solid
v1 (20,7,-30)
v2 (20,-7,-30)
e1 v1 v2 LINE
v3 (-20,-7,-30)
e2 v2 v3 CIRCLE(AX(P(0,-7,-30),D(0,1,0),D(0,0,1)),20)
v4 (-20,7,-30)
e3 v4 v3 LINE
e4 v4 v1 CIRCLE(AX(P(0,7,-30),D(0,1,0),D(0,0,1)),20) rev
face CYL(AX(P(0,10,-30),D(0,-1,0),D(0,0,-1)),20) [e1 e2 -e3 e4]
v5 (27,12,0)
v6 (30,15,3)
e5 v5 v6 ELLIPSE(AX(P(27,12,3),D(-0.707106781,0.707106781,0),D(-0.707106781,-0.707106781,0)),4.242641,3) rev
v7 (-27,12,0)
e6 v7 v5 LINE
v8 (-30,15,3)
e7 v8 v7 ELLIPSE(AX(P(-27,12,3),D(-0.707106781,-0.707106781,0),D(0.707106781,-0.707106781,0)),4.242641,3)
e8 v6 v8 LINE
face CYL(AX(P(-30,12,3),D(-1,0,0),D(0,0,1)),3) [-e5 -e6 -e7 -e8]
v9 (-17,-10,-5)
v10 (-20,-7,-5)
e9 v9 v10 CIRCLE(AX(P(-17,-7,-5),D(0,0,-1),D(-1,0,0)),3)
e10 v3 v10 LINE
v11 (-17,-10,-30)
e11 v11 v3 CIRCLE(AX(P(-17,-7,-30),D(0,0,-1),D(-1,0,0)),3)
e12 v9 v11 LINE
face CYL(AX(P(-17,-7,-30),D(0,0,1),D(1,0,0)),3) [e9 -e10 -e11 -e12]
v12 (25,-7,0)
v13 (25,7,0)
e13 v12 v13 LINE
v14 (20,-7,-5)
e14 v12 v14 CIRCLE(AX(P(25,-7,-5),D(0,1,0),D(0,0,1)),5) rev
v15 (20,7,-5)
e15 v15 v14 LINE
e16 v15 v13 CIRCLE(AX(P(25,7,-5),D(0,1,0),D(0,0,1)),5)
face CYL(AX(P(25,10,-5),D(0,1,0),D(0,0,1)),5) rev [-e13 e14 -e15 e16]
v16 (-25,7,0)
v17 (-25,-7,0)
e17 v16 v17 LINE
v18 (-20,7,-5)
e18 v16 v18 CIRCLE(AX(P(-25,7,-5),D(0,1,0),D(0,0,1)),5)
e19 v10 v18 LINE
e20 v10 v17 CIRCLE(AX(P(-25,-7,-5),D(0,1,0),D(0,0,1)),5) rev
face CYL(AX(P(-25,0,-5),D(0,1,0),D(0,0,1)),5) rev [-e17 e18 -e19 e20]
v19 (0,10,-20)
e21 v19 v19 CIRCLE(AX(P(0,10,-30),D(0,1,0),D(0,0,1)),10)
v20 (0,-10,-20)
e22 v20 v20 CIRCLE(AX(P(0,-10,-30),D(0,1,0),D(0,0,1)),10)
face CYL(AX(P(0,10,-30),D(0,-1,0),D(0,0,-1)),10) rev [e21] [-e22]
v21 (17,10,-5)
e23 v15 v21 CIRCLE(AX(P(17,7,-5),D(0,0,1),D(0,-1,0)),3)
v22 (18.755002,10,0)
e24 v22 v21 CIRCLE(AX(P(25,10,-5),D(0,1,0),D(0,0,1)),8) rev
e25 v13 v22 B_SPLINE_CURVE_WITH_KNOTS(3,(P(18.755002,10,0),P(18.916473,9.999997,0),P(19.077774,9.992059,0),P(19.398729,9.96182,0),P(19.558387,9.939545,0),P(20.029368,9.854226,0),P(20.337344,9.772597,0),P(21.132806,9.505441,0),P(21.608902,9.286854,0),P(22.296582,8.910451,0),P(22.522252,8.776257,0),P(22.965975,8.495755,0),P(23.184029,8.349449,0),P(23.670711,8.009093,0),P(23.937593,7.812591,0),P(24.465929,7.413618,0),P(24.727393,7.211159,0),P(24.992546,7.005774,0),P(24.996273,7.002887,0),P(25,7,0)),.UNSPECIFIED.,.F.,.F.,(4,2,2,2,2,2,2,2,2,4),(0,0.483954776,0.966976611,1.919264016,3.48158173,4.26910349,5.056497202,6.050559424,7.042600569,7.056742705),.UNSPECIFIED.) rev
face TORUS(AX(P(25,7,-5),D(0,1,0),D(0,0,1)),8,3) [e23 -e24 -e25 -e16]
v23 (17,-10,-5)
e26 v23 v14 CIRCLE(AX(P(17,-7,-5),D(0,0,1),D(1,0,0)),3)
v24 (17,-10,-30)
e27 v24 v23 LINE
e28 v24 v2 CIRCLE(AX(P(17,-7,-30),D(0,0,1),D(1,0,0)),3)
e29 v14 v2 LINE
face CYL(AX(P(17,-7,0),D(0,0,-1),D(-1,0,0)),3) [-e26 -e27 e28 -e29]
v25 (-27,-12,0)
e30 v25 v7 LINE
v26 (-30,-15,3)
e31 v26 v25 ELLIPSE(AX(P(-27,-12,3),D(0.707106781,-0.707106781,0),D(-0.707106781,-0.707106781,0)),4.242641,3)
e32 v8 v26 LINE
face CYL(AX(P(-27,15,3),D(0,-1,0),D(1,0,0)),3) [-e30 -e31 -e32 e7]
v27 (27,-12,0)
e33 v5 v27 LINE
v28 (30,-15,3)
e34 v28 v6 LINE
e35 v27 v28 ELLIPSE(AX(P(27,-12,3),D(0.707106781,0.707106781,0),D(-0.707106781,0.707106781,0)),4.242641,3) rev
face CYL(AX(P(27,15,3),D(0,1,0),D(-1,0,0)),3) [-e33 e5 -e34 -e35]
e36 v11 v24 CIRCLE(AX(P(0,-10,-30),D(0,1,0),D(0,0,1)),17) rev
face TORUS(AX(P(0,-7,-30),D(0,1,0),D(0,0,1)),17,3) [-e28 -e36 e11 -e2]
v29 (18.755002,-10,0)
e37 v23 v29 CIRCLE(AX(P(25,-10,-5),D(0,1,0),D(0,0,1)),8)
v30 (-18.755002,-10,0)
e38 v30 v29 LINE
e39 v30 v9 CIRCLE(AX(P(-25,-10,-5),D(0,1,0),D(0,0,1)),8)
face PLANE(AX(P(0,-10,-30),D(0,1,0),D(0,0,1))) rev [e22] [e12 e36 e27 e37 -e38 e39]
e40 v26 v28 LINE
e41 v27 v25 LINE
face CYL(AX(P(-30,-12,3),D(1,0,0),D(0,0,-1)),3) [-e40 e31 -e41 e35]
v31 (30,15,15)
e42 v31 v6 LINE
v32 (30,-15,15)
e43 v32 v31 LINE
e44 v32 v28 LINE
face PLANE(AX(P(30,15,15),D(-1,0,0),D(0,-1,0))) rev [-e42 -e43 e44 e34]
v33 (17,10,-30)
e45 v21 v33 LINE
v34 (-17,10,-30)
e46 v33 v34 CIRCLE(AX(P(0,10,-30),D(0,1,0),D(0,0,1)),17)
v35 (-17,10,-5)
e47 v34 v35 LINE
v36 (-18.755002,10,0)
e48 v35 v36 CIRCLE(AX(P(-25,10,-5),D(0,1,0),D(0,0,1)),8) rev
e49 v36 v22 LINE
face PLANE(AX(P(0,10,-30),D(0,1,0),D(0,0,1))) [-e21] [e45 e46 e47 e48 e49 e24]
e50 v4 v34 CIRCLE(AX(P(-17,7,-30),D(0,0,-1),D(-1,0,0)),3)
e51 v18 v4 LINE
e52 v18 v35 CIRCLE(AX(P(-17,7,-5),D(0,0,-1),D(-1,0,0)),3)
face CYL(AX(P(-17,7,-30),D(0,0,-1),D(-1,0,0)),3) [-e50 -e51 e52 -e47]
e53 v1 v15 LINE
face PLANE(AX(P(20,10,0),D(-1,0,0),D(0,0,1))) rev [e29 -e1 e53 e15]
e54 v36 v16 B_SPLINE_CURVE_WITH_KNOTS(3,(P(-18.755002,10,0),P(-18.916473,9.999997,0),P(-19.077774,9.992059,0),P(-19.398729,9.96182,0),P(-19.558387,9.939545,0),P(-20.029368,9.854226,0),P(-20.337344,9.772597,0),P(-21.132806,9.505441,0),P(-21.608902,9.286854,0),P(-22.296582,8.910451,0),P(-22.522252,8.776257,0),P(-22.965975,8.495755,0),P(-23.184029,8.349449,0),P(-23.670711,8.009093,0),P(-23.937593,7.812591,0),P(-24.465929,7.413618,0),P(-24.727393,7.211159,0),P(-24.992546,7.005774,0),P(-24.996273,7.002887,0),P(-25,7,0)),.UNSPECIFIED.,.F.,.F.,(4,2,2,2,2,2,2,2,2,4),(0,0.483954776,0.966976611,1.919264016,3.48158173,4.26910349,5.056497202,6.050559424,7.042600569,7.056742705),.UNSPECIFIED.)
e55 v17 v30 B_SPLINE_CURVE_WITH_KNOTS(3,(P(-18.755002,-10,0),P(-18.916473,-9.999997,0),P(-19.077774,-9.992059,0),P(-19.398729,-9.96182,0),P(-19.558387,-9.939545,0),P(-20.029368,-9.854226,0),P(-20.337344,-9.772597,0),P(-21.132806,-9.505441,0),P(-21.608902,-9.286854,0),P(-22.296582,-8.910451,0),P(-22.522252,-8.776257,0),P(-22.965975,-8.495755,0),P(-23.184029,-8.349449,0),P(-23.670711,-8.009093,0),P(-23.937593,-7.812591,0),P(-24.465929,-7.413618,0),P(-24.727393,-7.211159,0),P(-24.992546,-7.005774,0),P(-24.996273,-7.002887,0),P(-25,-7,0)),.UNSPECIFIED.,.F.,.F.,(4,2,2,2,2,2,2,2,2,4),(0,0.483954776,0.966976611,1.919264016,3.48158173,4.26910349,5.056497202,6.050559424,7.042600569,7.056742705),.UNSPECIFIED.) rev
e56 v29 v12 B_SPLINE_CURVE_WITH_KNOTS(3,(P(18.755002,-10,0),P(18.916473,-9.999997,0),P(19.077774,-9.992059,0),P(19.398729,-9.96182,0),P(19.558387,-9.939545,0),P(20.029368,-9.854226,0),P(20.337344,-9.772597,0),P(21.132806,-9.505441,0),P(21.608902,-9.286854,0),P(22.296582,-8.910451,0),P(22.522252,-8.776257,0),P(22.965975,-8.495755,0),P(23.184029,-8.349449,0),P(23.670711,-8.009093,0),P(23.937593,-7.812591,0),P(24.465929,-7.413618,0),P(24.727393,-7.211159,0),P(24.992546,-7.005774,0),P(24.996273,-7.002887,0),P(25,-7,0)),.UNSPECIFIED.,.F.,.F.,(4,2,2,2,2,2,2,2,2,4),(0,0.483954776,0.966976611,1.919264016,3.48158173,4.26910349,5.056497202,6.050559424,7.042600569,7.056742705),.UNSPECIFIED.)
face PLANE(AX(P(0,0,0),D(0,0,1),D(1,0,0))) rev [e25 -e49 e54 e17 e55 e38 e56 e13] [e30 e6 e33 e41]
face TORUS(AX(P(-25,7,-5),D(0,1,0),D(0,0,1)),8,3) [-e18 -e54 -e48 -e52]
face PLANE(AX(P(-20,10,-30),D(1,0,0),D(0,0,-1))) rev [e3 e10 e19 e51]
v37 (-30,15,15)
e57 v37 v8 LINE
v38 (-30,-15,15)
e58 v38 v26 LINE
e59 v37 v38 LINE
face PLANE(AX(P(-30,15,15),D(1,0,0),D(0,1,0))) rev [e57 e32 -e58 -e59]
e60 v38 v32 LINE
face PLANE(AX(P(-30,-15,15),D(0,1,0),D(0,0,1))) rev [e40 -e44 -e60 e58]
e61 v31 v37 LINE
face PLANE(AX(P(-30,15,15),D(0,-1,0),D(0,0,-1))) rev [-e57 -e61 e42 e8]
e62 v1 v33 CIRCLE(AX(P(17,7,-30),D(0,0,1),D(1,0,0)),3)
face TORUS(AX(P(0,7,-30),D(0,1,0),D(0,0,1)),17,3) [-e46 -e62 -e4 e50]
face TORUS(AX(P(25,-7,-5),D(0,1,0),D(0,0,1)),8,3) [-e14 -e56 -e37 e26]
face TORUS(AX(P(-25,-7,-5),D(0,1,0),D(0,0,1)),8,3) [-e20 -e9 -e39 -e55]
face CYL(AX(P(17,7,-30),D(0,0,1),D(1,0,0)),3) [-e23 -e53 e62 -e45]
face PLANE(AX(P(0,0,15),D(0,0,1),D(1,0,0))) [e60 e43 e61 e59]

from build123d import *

# Parameters (mm, degrees)
SKETCH1_W           = 60
SKETCH1_H           = 30
BOSS_EXTRUDE1_DEPTH = 15
SKETCH2_R           = 10
BOSS_EXTRUDE2_DEPTH = 10
FILLET1_R           = 5
FILLET2_R           = 3


with BuildPart() as part:
    # Sketch1 → Boss-Extrude1 (new body)
    with BuildSketch(Plane.XY):
        Rectangle(SKETCH1_W, SKETCH1_H)
    extrude(amount=BOSS_EXTRUDE1_DEPTH)

    # Sketch2 → Boss-Extrude2 (add, symmetric)
    with BuildSketch(Plane(origin=(0, 0, 0), x_dir=(1, 0, 0), z_dir=(0, 1, 0))):
        with BuildLine():
            Line((-20, 30), (-20, 0))
            Line((-20, 0), (20, 0))
            Line((20, 0), (20, 30))
            ThreePointArc((20, 30), (0, 50), (-20, 30))
        make_face()
        with Locations(Location((0, 30, 0), (0, 0, 270))):
            Circle(SKETCH2_R, mode=Mode.SUBTRACT)
    extrude(amount=BOSS_EXTRUDE2_DEPTH, both=True)

    # Fillet1
    fillet1_edges = [part.edges().sort_by_distance(p)[0] for p in [
        (-20, 0, 0),
        (20, 0, 0),
    ]]
    fillet(fillet1_edges, radius=FILLET1_R)

    # Fillet2
    # the kernel refuses this fillet: 3 mm, written as the material it takes off along each edge
    with BuildSketch(Plane(origin=(0, 10, -30), x_dir=(1, 0, 0), z_dir=(0, 0, 1))) as fillet2_piece_1:
        with BuildLine():
            CenterArc((20 - FILLET2_R, -FILLET2_R), FILLET2_R, 0, 90)
            Line((20 - FILLET2_R, 0), (20, 0))
            Line((20, 0), (20, -FILLET2_R))
        make_face()
    revolve(axis=Axis((0, 10, -30), (0, 1, 0)), revolution_arc=180, mode=Mode.SUBTRACT)
    with BuildSketch(Plane(origin=(-20, 10, -30), x_dir=(0, -1, 0), z_dir=(0, 0, 1)), Plane(origin=(20, 10, -5), x_dir=(0, -1, 0), z_dir=(0, 0, -1))) as fillet2_piece_2:
        with BuildLine():
            CenterArc((FILLET2_R, FILLET2_R), FILLET2_R, 180, 90)
            Line((0, FILLET2_R), (0, 0))
            Line((0, 0), (FILLET2_R, 0))
        make_face()
    extrude(amount=25, mode=Mode.SUBTRACT)
    with BuildSketch(Plane(origin=(0, -10, -30), x_dir=(1, 0, 0), z_dir=(0, 0, 1))) as fillet2_piece_3:
        with BuildLine():
            CenterArc((20 - FILLET2_R, FILLET2_R), FILLET2_R, 270, 90)
            Line((20 - FILLET2_R, 0), (20, 0))
            Line((20, 0), (20, FILLET2_R))
        make_face()
    revolve(axis=Axis((0, -10, -30), (0, 1, 0)), revolution_arc=180, mode=Mode.SUBTRACT)
    with BuildSketch(Plane(origin=(-20, -10, -30), x_dir=(0, 1, 0), z_dir=(0, 0, 1)), Plane(origin=(20, -10, -5), x_dir=(0, 1, 0), z_dir=(0, 0, -1))) as fillet2_piece_4:
        with BuildLine():
            CenterArc((FILLET2_R, -FILLET2_R), FILLET2_R, 90, 90)
            Line((0, -FILLET2_R), (0, 0))
            Line((0, 0), (FILLET2_R, 0))
        make_face()
    extrude(amount=25, mode=Mode.SUBTRACT)
    with BuildSketch(Plane(origin=(25, -10, -5), x_dir=(0.9975374290817743, 0, 0.07013613605641604), z_dir=(0.07013613605641604, 0, -0.9975374290817743))) as fillet2_piece_5_section:
        with BuildLine():
            CenterArc((5 + FILLET2_R, -FILLET2_R), FILLET2_R, 90, 90)
            Line((5 + FILLET2_R, 0), (5, 0))
            Line((5, 0), (5, -FILLET2_R))
        make_face()
    fillet2_piece_5 = revolve(axis=Axis((25, -10, -5), (0, -1, 0)), revolution_arc=175.978193542, mode=Mode.PRIVATE)
    fillet2_piece_5 = split(fillet2_piece_5, bisect_by=Plane(origin=(21.314130097, -9.156886231, 0), z_dir=(0, 0, -1)), keep=Keep.TOP, mode=Mode.PRIVATE)
    add(fillet2_piece_5, mode=Mode.SUBTRACT)
    with BuildSketch(Plane(origin=(25, 10, -5), x_dir=(0.9975374290817743, 0, 0.07013613605641604), z_dir=(0.07013613605641604, 0, -0.9975374290817743))) as fillet2_piece_6_section:
        with BuildLine():
            CenterArc((5 + FILLET2_R, FILLET2_R), FILLET2_R, 180, 90)
            Line((5, FILLET2_R), (5, 0))
            Line((5, 0), (5 + FILLET2_R, 0))
        make_face()
    fillet2_piece_6 = revolve(axis=Axis((25, 10, -5), (0, -1, 0)), revolution_arc=175.978193542, mode=Mode.PRIVATE)
    fillet2_piece_6 = split(fillet2_piece_6, bisect_by=Plane(origin=(21.314129988, 9.156886191, 0), z_dir=(0, 0, -1)), keep=Keep.TOP, mode=Mode.PRIVATE)
    add(fillet2_piece_6, mode=Mode.SUBTRACT)
    with BuildSketch(Plane(origin=(-25, -10, -5), x_dir=(-0.9975374290817743, 0, 0.07013613605641587), z_dir=(-0.07013613605641587, 0, -0.9975374290817743))) as fillet2_piece_7_section:
        with BuildLine():
            CenterArc((5 + FILLET2_R, FILLET2_R), FILLET2_R, 180, 90)
            Line((5 + FILLET2_R, 0), (5, 0))
            Line((5, 0), (5, FILLET2_R))
        make_face()
    fillet2_piece_7 = revolve(axis=Axis((-25, -10, -5), (0, 1, 0)), revolution_arc=175.978193542, mode=Mode.PRIVATE)
    fillet2_piece_7 = split(fillet2_piece_7, bisect_by=Plane(origin=(-21.314129744, -9.156885957, 0), z_dir=(0, 0, -1)), keep=Keep.TOP, mode=Mode.PRIVATE)
    add(fillet2_piece_7, mode=Mode.SUBTRACT)
    with BuildSketch(Plane(origin=(-25, 10, -5), x_dir=(-0.9975374290817743, 0, 0.07013613605641587), z_dir=(-0.07013613605641587, 0, -0.9975374290817743))) as fillet2_piece_8_section:
        with BuildLine():
            CenterArc((5 + FILLET2_R, -FILLET2_R), FILLET2_R, 90, 90)
            Line((5 + FILLET2_R, 0), (5, 0))
            Line((5, 0), (5, -FILLET2_R))
        make_face()
    fillet2_piece_8 = revolve(axis=Axis((-25, 10, -5), (0, 1, 0)), revolution_arc=175.978193542, mode=Mode.PRIVATE)
    fillet2_piece_8 = split(fillet2_piece_8, bisect_by=Plane(origin=(-21.314129744, 9.156885957, 0), z_dir=(0, 0, -1)), keep=Keep.TOP, mode=Mode.PRIVATE)
    add(fillet2_piece_8, mode=Mode.SUBTRACT)
    with BuildSketch(Plane(origin=(37.5, -15, 0), x_dir=(0, 1, 0), z_dir=(-1, 0, 0)), Plane(origin=(-37.5, 15, 0), x_dir=(0, -1, 0), z_dir=(1, 0, 0))) as fillet2_piece_9:
        with BuildLine():
            CenterArc((FILLET2_R, -FILLET2_R), FILLET2_R, 90, 90)
            Line((0, -FILLET2_R), (0, 0))
            Line((0, 0), (FILLET2_R, 0))
        make_face()
    extrude(amount=75, mode=Mode.SUBTRACT)
    with BuildSketch(Plane(origin=(-30, -22.5, 0), x_dir=(1, 0, 0), z_dir=(0, 1, 0)), Plane(origin=(30, 22.5, 0), x_dir=(-1, 0, 0), z_dir=(0, -1, 0))) as fillet2_piece_10:
        with BuildLine():
            CenterArc((FILLET2_R, -FILLET2_R), FILLET2_R, 90, 90)
            Line((0, -FILLET2_R), (0, 0))
            Line((0, 0), (FILLET2_R, 0))
        make_face()
    extrude(amount=45, mode=Mode.SUBTRACT)


solid = part.part
